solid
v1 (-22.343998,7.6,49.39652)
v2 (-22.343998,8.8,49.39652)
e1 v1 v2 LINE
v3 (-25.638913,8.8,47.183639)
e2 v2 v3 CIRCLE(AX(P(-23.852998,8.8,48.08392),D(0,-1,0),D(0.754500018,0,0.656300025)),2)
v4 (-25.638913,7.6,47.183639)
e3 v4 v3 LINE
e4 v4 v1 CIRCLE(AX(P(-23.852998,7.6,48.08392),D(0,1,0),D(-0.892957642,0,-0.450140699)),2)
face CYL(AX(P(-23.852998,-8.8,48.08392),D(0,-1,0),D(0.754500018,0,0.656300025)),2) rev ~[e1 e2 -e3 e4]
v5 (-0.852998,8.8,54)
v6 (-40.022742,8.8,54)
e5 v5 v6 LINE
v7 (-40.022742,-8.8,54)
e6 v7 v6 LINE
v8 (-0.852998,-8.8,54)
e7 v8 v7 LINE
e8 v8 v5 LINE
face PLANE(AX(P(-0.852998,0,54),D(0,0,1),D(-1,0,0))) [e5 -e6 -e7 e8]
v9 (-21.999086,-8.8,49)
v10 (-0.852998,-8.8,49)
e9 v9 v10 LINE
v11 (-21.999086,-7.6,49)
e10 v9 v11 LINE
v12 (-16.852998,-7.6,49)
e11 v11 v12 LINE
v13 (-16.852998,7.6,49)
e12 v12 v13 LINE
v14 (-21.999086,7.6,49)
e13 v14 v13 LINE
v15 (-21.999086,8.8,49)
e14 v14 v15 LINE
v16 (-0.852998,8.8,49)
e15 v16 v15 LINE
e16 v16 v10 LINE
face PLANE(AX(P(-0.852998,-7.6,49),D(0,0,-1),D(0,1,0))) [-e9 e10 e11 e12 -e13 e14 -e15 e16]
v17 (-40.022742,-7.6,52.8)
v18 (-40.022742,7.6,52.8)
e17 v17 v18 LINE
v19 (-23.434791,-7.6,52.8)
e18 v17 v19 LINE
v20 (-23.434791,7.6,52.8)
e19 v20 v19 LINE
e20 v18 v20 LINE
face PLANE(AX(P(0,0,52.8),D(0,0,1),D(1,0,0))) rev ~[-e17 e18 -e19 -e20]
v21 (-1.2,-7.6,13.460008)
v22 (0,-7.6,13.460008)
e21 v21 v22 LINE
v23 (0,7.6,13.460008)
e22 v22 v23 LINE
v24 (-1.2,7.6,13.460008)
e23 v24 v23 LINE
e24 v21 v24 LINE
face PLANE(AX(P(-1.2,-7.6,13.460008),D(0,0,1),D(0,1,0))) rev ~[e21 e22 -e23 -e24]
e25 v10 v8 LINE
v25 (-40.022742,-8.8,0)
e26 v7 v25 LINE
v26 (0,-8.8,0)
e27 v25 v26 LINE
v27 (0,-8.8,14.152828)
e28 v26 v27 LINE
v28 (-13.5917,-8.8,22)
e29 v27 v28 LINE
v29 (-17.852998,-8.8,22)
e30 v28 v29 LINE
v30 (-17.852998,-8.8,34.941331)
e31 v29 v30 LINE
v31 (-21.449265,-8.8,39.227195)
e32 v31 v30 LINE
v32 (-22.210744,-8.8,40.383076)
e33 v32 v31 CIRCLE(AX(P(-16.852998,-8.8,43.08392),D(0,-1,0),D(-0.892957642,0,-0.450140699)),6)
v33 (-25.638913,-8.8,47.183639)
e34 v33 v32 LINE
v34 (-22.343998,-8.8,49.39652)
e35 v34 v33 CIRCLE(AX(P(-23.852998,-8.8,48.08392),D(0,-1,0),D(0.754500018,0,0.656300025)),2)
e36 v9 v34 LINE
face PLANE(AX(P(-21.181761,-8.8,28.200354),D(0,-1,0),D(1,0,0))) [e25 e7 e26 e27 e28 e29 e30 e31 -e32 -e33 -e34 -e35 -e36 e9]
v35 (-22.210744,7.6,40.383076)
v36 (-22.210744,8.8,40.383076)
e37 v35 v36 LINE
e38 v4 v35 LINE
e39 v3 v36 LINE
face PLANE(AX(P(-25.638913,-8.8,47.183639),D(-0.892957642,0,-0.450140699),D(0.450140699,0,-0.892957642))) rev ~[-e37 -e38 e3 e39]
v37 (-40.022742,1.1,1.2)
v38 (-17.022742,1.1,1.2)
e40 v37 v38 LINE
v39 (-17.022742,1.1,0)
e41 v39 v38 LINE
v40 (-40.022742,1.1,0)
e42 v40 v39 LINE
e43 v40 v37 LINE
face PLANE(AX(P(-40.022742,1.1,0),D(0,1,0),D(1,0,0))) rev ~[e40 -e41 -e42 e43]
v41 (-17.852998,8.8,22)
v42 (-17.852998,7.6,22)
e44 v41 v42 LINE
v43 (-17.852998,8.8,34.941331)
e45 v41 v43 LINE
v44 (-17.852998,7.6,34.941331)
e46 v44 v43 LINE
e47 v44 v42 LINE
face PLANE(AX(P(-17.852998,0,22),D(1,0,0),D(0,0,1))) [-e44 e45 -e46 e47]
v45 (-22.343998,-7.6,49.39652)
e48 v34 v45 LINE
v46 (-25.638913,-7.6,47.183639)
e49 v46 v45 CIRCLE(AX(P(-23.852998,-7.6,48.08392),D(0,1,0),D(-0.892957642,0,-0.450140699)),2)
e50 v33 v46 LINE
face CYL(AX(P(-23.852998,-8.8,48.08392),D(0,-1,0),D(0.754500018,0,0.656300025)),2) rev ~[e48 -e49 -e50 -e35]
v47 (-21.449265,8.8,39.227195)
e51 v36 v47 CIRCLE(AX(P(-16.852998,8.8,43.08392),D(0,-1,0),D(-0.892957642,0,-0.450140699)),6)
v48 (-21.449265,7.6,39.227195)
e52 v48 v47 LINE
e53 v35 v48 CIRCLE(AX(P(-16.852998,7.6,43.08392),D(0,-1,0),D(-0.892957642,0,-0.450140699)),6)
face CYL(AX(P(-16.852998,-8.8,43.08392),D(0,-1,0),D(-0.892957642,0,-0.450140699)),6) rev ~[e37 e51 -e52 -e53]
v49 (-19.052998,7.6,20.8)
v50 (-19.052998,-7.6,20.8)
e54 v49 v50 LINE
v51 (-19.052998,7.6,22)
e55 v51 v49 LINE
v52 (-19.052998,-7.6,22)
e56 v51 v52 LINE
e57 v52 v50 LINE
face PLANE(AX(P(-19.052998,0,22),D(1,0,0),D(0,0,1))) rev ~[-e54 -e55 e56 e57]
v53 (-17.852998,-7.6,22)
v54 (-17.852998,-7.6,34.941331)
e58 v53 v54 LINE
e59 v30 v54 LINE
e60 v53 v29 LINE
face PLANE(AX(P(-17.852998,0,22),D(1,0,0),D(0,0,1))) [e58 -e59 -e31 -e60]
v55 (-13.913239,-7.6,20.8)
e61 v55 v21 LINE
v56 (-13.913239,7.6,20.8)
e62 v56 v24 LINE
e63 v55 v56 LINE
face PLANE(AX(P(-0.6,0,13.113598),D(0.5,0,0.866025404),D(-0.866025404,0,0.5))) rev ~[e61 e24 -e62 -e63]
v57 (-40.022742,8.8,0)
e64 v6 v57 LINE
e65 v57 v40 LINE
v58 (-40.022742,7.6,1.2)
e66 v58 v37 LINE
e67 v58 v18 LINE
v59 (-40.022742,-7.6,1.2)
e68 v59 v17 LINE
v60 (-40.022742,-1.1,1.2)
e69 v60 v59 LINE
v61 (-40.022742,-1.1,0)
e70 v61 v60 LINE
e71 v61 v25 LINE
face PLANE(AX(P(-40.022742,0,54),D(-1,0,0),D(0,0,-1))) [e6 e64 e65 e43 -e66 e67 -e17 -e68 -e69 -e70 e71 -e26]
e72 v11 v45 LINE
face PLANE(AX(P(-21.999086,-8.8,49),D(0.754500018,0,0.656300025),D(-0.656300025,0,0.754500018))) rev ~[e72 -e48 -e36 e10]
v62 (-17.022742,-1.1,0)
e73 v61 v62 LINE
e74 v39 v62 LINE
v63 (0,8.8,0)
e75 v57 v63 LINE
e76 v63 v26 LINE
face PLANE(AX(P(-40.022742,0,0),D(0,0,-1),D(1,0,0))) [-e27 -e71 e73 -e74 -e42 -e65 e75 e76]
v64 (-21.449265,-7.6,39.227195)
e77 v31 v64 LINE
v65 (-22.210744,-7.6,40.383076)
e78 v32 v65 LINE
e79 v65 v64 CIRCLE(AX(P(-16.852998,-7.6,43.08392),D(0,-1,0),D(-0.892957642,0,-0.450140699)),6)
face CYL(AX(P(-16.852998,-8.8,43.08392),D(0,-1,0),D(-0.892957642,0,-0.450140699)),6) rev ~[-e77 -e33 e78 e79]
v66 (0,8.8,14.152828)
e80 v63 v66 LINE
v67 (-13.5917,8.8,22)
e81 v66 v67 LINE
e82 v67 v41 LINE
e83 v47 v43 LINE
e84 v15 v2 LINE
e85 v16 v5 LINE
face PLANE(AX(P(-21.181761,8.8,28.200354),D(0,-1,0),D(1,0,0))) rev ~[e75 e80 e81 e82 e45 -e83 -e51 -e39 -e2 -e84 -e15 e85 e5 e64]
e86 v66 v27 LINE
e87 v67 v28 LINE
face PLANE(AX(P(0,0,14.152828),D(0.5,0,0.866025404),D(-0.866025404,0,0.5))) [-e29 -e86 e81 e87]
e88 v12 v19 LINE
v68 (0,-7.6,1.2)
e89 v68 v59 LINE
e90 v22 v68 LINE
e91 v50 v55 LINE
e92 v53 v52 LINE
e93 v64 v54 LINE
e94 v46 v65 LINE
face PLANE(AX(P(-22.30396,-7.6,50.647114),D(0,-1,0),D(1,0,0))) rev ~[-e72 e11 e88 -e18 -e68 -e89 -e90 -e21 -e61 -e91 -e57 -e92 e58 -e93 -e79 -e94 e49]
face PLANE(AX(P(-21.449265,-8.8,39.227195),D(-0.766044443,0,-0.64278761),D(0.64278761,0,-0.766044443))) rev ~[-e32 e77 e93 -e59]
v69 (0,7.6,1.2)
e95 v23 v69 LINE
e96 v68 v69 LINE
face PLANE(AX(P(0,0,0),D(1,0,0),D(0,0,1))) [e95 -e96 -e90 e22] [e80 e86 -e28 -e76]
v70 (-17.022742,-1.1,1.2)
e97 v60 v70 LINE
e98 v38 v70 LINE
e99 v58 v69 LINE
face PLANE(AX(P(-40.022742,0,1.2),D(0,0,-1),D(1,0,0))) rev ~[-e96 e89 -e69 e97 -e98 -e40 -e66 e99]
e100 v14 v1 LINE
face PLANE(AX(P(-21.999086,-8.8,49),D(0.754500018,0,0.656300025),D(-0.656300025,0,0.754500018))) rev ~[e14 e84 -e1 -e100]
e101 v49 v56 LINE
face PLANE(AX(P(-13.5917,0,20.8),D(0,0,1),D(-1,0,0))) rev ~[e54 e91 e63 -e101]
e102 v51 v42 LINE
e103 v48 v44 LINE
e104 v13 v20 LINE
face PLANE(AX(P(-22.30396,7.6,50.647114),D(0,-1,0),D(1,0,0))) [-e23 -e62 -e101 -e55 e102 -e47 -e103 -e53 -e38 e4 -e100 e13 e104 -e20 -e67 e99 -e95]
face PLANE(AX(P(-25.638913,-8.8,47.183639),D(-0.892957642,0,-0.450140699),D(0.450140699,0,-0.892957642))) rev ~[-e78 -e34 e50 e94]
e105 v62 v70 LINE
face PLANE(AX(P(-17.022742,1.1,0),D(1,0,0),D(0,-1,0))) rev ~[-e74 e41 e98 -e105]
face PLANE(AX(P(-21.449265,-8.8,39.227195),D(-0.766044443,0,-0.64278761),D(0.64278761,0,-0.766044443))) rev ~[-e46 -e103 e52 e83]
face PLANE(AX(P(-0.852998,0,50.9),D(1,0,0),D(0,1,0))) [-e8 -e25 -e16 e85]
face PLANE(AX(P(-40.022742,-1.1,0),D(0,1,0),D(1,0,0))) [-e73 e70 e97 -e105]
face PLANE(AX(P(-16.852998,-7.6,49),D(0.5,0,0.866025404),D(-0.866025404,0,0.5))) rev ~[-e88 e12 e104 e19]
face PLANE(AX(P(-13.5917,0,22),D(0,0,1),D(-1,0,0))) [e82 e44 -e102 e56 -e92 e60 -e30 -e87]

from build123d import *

# Parameters (mm, degrees)
F0_R         = 2.3
F1_DEPTH     = 8.8
F2_T         = -1.2
F3_DEPTH     = 1.2
F4_DEPTH     = 28.2
F5_DEPTH     = 1.2
F6_W         = 23
F6_H         = 2.2
F7_DEPTH     = 1.2
F9_DEPTH     = 17.6
F10_W        = 15.2
F10_H        = 3.8
F11_DEPTH    = 25
F12_T4_DEPTH = 15.2


# Not quite as in the source:
# - a fillet or chamfer that OpenCascade refuses, or shapes differently, is made with other operations: its cross-section is extruded or revolved along the edge and cut away or added
# - a feature names something its author has since deleted; it is built from what else it names


with BuildPart() as f1:
    # F0 (on Front) → F1 (new body, symmetric)
    with BuildSketch(Plane.XZ):
        Polygon((-40.0227420032, 54), (-40.0227420032, 0), (0, 0), (0, 14.1528282114), (-13.5917002335, 22), (-17.8529980872, 22), (-17.8529980872, 49), (-0.8529980872, 49), (-0.8529980872, 54), (-17.8529980872, 54), align=None)
        with Locations((-24.1529980872, 48.7)):
            Circle(F0_R, mode=Mode.SUBTRACT)
        with Locations((-24.1529980872, 48.7)):
            Circle(F0_R)
    extrude(amount=F1_DEPTH, both=True)

    # F2
    f2_openings = [f1.faces().sort_by_distance(p)[0] for p in [
        (-40.022742, 0, 27),
    ]]
    offset(amount=F2_T, openings=f2_openings, kind=Kind.INTERSECTION)

    # F3 (cut, through all): a face of the model
    f3_faces = [f1.faces().sort_by_distance(p)[0] for p in [
        (-2.0529980872, 0, 51.5),
    ]]
    extrude(f3_faces, amount=-F3_DEPTH, mode=Mode.SUBTRACT)

    # F4 (cut, through all): a face of the model
    f4_faces = [f1.faces().sort_by_distance(p)[0] for p in [
        (-9.9529980872, 0, 50.2),
    ]]
    extrude(f4_faces, amount=-F4_DEPTH, mode=Mode.SUBTRACT)

    # F5 (cut, through all): a face of the model
    f5_faces = [f1.faces().sort_by_distance(p)[0] for p in [
        (-1.2, 0, 7.3300039442),
    ]]
    extrude(f5_faces, amount=-F5_DEPTH, mode=Mode.SUBTRACT)

    # F6 (on face) → F7 (cut, through all)
    with BuildSketch(Plane(origin=(0, 0, 0), x_dir=(1, 0, 0), z_dir=(0, 0, -1))):
        with Locations((-28.5227420032, 0)):
            Rectangle(F6_W, F6_H)
    extrude(amount=-F7_DEPTH, mode=Mode.SUBTRACT)

    # F8 (on face) → F9 (cut, through all)
    with BuildSketch(Plane.XZ.offset(8.8)):
        with BuildLine():
            ThreePointArc((-22.2107439409, 40.3830760217), (-22.207256, 45.7916724587), (-17.8529980872, 49))
            Line((-17.8529980872, 49), (-21.9990858511, 49))
            Line((-21.9990858511, 49), (-22.3439980513, 49.3965202671))
            ThreePointArc((-22.3439980513, 49.3965202671), (-24.9680683048, 49.7442269385), (-25.6389133718, 47.1836388185))
            Line((-25.6389133718, 47.1836388185), (-22.2107439409, 40.3830760217))
        make_face()
        with BuildLine():
            Line((-17.8529980872, 34.9413308483), (-17.8529980872, 49))
            ThreePointArc((-17.8529980872, 49), (-22.207256, 45.7916724587), (-22.2107439409, 40.3830760217))
            ThreePointArc((-22.2107439409, 40.3830760217), (-21.8634478438, 39.783103161), (-21.4492647459, 39.2271945588))
            Line((-21.4492647459, 39.2271945588), (-17.8529980872, 34.9413308483))
        make_face()
    extrude(amount=-F9_DEPTH, mode=Mode.SUBTRACT)

    # F10 (on face) → F11 (join)
    with BuildSketch(Plane.YZ.offset(-0.8529980872)):
        with Locations((0, 50.9)):
            Rectangle(F10_W, F10_H)
    extrude(amount=-F11_DEPTH)

    # F12: chamfer of 9 x 5.1961524227 on 1 edges, made by hand


with BuildPart() as f12_tool2:
    # F12_s3 → F12_t4 (new body)
    with BuildSketch(Plane.XZ.offset(7.6)):
        Polygon((-16.8529980872, 49), (-25.8529980872, 54.1961524227), (-25.8529980872, 49), align=None)
    extrude(amount=-F12_T4_DEPTH)

    split(bisect_by=Plane.XY.offset(52.8), keep=Keep.BOTTOM)


with BuildPart() as f1_1:
    add(f1.part)

    # F12_t1: cut F12_tool2
    add(f12_tool2.part, mode=Mode.SUBTRACT)


solid = f1_1.part
